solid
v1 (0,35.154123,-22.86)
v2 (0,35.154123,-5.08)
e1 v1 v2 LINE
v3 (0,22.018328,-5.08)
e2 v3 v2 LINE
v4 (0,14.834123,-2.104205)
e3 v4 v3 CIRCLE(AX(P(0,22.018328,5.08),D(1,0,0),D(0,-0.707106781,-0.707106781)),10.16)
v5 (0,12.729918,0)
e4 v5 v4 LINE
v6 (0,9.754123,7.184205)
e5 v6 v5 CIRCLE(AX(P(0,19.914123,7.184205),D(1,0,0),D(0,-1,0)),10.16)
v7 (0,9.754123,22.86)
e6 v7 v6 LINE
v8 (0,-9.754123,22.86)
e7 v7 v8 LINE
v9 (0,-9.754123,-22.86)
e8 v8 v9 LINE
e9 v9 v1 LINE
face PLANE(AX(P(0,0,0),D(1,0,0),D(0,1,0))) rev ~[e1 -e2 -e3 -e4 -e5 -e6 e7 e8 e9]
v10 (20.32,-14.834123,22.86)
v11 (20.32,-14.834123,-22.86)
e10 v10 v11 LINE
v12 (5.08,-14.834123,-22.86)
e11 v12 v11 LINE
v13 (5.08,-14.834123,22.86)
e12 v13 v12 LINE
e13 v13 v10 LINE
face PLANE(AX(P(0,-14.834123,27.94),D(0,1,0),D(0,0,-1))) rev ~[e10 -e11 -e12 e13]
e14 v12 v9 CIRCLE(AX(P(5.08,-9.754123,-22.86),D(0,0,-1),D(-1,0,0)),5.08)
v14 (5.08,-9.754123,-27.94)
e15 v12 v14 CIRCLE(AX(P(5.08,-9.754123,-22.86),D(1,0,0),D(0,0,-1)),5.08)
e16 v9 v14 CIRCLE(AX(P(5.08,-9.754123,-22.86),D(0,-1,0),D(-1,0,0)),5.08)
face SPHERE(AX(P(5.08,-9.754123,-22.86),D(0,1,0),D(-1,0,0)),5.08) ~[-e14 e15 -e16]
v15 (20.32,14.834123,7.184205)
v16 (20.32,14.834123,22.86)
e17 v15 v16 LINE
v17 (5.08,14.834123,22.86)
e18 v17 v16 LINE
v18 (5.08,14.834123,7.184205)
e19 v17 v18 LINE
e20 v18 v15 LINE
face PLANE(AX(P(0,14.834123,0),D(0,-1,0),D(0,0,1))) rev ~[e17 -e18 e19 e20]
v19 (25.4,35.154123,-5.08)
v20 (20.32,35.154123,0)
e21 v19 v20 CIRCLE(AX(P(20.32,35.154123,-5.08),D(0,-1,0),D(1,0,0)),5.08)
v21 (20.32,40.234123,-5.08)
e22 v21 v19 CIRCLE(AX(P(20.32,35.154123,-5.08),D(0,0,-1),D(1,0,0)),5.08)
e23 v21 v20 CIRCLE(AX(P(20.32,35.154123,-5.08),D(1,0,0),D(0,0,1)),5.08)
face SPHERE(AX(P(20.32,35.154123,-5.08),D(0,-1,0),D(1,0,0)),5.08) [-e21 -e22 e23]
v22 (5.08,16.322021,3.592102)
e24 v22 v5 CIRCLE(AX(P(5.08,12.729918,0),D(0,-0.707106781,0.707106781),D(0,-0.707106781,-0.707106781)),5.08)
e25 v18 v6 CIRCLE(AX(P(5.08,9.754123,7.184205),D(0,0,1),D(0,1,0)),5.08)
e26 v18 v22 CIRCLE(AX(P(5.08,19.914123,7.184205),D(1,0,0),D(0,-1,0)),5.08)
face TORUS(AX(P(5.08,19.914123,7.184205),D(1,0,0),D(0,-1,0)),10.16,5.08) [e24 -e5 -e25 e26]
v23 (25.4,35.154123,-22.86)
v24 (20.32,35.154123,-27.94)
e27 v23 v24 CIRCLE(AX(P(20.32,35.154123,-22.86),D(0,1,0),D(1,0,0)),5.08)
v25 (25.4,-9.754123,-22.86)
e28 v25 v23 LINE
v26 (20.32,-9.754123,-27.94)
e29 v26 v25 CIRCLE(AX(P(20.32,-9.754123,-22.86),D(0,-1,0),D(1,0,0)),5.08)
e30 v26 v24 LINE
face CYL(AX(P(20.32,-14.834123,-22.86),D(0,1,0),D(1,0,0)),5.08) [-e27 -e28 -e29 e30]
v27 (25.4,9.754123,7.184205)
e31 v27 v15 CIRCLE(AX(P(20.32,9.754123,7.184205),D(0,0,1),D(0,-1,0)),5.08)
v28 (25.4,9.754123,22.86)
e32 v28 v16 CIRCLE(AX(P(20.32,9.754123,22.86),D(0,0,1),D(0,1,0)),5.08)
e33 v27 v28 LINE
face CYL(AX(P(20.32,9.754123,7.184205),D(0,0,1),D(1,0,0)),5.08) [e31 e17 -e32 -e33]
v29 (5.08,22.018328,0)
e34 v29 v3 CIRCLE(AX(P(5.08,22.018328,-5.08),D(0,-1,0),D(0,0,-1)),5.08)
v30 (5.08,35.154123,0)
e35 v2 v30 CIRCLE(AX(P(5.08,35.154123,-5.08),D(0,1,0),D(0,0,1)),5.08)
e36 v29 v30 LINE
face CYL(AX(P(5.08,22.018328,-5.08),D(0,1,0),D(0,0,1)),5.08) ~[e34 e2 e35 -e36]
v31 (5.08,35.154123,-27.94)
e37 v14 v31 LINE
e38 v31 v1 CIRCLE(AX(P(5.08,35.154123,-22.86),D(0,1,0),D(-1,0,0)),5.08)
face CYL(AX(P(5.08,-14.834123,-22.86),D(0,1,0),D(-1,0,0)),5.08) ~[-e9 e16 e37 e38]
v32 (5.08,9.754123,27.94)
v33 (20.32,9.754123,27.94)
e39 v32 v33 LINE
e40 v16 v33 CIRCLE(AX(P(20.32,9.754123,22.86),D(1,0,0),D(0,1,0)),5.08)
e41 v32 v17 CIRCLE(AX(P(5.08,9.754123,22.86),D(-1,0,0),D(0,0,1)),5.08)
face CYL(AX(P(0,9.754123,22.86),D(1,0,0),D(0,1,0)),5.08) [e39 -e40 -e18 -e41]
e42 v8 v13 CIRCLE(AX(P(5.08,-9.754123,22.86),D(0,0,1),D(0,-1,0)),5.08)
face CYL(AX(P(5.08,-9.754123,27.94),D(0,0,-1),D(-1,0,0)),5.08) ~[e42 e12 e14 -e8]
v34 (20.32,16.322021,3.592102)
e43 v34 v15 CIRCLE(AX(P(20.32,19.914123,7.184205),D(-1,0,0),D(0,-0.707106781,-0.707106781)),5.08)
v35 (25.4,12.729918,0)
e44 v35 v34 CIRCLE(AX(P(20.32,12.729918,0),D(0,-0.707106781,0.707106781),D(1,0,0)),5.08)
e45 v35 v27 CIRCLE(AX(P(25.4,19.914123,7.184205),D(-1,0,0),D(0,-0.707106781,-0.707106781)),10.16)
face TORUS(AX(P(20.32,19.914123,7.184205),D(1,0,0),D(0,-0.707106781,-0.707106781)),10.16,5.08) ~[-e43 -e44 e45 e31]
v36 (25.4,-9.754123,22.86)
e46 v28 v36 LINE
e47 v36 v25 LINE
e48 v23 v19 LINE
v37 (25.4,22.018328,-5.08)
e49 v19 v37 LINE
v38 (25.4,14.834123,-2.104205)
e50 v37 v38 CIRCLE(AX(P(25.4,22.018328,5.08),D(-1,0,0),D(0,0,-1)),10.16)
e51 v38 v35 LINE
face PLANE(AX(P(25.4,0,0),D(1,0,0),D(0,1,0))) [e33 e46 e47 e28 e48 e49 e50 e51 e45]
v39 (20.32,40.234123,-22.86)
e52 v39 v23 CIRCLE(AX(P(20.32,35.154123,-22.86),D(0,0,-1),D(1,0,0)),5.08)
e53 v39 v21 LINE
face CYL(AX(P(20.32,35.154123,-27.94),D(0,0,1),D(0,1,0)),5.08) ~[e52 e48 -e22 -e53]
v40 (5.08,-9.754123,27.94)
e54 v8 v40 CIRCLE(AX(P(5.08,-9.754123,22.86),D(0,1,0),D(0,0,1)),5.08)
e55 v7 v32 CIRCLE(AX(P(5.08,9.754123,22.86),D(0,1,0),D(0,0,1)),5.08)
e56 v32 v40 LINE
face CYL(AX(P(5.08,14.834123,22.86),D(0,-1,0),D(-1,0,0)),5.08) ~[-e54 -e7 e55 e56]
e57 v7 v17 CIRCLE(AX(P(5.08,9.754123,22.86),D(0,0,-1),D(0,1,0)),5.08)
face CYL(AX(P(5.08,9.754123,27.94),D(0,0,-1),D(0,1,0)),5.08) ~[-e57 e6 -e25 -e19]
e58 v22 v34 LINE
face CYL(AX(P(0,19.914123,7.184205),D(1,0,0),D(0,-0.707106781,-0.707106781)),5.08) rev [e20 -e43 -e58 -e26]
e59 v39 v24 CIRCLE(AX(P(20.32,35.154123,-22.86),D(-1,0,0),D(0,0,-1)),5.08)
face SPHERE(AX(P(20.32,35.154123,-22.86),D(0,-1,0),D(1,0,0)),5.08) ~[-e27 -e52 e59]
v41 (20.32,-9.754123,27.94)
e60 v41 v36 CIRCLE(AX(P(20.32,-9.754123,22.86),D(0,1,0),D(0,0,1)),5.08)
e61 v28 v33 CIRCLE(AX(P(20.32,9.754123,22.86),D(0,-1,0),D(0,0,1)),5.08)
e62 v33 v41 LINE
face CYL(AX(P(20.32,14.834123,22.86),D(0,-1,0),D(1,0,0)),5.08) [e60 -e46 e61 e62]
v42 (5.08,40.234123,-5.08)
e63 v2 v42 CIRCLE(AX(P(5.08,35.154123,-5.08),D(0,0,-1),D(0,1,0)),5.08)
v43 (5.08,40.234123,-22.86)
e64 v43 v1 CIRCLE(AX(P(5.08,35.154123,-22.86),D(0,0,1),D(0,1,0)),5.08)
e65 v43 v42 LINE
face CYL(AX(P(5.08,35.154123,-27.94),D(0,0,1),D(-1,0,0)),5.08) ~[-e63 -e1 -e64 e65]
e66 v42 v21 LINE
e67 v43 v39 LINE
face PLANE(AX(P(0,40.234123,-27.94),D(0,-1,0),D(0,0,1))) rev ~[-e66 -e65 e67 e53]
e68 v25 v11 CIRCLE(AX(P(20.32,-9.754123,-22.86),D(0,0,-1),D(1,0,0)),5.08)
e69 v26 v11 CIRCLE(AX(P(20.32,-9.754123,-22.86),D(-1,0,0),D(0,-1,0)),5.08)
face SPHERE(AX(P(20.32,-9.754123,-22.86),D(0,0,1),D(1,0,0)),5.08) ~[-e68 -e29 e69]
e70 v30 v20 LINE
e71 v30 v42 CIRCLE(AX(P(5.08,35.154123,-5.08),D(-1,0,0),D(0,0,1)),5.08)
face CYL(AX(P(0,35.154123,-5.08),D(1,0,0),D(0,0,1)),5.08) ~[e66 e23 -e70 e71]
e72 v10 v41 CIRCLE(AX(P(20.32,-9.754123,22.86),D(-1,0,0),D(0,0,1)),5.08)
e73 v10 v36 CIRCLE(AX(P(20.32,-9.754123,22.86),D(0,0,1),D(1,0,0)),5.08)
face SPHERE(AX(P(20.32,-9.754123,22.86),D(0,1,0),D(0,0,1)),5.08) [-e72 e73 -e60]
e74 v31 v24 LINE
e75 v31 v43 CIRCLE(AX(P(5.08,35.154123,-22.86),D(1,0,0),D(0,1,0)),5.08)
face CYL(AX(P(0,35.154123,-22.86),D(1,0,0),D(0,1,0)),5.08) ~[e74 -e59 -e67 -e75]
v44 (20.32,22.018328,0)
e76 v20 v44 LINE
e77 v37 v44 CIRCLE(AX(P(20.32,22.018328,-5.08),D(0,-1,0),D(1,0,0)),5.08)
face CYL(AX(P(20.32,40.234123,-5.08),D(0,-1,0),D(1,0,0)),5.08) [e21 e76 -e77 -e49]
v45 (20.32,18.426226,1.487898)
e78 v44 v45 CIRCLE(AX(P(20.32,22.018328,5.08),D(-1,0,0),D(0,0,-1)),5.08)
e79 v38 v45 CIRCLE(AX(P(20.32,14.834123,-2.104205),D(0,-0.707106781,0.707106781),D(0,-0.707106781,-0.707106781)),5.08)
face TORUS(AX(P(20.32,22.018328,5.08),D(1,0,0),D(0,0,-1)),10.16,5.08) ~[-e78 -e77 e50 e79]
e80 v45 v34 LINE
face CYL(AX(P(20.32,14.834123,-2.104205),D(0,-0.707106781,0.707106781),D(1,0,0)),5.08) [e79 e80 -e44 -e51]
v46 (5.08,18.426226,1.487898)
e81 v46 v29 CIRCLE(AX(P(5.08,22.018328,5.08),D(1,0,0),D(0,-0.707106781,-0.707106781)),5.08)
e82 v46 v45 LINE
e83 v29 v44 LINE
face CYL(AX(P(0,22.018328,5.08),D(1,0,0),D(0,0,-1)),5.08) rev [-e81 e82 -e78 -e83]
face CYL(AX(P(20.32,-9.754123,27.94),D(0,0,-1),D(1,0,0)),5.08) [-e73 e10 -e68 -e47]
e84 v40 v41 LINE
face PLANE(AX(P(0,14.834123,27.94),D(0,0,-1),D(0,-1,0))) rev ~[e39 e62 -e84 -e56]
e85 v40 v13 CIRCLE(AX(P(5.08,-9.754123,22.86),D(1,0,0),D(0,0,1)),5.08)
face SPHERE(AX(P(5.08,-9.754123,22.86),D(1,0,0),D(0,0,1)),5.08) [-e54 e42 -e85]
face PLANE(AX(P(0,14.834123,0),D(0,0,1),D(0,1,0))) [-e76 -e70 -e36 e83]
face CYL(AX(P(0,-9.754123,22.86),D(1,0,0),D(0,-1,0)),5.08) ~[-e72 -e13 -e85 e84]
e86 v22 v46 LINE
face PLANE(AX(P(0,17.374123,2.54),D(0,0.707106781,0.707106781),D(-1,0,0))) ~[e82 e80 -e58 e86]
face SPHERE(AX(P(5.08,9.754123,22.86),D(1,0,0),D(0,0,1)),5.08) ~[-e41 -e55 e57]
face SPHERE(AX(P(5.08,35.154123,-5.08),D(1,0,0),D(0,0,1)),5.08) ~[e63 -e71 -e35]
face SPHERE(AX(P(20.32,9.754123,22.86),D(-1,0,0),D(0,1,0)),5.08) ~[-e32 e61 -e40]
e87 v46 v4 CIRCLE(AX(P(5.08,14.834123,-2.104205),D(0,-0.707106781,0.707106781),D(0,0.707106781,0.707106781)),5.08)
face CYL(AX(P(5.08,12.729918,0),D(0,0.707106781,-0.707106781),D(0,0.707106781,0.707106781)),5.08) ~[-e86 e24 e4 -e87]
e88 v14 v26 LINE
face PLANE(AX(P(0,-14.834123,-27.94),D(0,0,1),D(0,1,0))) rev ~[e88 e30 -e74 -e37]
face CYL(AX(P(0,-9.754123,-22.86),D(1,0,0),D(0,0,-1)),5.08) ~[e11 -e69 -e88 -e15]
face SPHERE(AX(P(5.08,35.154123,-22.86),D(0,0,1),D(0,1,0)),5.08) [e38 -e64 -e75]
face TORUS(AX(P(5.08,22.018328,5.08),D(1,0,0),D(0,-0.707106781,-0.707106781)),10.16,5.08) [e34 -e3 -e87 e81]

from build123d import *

# Parameters (mm, degrees)
F0_W     = 25.4
F0_H     = 27.94
F1_DEPTH = 25.4
F2_SIZE  = 5.08
F3_F1_R  = 5.08
F3_F2_R  = 5.08


with BuildPart() as f1:
    # F0 (on Right) → F1 (new body)
    with BuildSketch(Plane.YZ):
        Polygon((-14.8341231188, -27.94), (14.8341231188, -27.94), (14.8341231188, 0), (14.8341231188, 27.94), (-14.8341231188, 27.94), align=None)
        with Locations((27.5341231188, -13.97)):
            Rectangle(F0_W, F0_H)
    extrude(amount=F1_DEPTH)

    # F2
    f2_edges = [f1.edges().sort_by_distance(p)[0] for p in [
        (12.7, 14.834123, 0),
    ]]
    chamfer(f2_edges, length=F2_SIZE)

    # F3: fillet of radius 5.08 on 20 edges, made by hand

    # F3_f1
    f3_f1_edges = [f1.edges().sort_by_distance(p)[0] for p in [
        (12.7, 14.8341231188, 5.08),
        (12.7, 19.9141231188, 0),
    ]]
    fillet(f3_f1_edges, radius=F3_F1_R)

    # F3_f2
    f3_f2_edges = [f1.edges().sort_by_distance(p)[0] for p in [
        (12.7, 14.8341231188, 27.94),
        (25.4, 14.8341231188, 17.5621024484),
        (25.4, 0, 27.94),
        (12.7, -14.8341231188, 27.94),
        (0, 0, 27.94),
        (25.4, -14.8341231188, 0),
        (25.4, 12.7, -27.94),
        (25.4, 31.1262255672, 0),
        (25.4, 40.2341231188, -13.97),
        (12.7, 40.2341231188, 0),
        (0, 31.1262255672, 0),
        (0, 40.2341231188, -13.97),
        (12.7, 40.2341231188, -27.94),
        (0, 17.3741231188, 2.54),
        (25.4, 17.3741231188, 2.54),
        (0, 12.7, -27.94),
        (0, -14.8341231188, 0),
        (12.7, -14.8341231188, -27.94),
        (25.4, 20.0742961792, 0.3866919748),
        (25.4, 15.2208150936, 5.2401730604),
        (0, 20.0742961792, 0.3866919748),
        (0, 15.2208150936, 5.2401730604),
    ]]
    fillet(f3_f2_edges, radius=F3_F2_R)


solid = f1.part
